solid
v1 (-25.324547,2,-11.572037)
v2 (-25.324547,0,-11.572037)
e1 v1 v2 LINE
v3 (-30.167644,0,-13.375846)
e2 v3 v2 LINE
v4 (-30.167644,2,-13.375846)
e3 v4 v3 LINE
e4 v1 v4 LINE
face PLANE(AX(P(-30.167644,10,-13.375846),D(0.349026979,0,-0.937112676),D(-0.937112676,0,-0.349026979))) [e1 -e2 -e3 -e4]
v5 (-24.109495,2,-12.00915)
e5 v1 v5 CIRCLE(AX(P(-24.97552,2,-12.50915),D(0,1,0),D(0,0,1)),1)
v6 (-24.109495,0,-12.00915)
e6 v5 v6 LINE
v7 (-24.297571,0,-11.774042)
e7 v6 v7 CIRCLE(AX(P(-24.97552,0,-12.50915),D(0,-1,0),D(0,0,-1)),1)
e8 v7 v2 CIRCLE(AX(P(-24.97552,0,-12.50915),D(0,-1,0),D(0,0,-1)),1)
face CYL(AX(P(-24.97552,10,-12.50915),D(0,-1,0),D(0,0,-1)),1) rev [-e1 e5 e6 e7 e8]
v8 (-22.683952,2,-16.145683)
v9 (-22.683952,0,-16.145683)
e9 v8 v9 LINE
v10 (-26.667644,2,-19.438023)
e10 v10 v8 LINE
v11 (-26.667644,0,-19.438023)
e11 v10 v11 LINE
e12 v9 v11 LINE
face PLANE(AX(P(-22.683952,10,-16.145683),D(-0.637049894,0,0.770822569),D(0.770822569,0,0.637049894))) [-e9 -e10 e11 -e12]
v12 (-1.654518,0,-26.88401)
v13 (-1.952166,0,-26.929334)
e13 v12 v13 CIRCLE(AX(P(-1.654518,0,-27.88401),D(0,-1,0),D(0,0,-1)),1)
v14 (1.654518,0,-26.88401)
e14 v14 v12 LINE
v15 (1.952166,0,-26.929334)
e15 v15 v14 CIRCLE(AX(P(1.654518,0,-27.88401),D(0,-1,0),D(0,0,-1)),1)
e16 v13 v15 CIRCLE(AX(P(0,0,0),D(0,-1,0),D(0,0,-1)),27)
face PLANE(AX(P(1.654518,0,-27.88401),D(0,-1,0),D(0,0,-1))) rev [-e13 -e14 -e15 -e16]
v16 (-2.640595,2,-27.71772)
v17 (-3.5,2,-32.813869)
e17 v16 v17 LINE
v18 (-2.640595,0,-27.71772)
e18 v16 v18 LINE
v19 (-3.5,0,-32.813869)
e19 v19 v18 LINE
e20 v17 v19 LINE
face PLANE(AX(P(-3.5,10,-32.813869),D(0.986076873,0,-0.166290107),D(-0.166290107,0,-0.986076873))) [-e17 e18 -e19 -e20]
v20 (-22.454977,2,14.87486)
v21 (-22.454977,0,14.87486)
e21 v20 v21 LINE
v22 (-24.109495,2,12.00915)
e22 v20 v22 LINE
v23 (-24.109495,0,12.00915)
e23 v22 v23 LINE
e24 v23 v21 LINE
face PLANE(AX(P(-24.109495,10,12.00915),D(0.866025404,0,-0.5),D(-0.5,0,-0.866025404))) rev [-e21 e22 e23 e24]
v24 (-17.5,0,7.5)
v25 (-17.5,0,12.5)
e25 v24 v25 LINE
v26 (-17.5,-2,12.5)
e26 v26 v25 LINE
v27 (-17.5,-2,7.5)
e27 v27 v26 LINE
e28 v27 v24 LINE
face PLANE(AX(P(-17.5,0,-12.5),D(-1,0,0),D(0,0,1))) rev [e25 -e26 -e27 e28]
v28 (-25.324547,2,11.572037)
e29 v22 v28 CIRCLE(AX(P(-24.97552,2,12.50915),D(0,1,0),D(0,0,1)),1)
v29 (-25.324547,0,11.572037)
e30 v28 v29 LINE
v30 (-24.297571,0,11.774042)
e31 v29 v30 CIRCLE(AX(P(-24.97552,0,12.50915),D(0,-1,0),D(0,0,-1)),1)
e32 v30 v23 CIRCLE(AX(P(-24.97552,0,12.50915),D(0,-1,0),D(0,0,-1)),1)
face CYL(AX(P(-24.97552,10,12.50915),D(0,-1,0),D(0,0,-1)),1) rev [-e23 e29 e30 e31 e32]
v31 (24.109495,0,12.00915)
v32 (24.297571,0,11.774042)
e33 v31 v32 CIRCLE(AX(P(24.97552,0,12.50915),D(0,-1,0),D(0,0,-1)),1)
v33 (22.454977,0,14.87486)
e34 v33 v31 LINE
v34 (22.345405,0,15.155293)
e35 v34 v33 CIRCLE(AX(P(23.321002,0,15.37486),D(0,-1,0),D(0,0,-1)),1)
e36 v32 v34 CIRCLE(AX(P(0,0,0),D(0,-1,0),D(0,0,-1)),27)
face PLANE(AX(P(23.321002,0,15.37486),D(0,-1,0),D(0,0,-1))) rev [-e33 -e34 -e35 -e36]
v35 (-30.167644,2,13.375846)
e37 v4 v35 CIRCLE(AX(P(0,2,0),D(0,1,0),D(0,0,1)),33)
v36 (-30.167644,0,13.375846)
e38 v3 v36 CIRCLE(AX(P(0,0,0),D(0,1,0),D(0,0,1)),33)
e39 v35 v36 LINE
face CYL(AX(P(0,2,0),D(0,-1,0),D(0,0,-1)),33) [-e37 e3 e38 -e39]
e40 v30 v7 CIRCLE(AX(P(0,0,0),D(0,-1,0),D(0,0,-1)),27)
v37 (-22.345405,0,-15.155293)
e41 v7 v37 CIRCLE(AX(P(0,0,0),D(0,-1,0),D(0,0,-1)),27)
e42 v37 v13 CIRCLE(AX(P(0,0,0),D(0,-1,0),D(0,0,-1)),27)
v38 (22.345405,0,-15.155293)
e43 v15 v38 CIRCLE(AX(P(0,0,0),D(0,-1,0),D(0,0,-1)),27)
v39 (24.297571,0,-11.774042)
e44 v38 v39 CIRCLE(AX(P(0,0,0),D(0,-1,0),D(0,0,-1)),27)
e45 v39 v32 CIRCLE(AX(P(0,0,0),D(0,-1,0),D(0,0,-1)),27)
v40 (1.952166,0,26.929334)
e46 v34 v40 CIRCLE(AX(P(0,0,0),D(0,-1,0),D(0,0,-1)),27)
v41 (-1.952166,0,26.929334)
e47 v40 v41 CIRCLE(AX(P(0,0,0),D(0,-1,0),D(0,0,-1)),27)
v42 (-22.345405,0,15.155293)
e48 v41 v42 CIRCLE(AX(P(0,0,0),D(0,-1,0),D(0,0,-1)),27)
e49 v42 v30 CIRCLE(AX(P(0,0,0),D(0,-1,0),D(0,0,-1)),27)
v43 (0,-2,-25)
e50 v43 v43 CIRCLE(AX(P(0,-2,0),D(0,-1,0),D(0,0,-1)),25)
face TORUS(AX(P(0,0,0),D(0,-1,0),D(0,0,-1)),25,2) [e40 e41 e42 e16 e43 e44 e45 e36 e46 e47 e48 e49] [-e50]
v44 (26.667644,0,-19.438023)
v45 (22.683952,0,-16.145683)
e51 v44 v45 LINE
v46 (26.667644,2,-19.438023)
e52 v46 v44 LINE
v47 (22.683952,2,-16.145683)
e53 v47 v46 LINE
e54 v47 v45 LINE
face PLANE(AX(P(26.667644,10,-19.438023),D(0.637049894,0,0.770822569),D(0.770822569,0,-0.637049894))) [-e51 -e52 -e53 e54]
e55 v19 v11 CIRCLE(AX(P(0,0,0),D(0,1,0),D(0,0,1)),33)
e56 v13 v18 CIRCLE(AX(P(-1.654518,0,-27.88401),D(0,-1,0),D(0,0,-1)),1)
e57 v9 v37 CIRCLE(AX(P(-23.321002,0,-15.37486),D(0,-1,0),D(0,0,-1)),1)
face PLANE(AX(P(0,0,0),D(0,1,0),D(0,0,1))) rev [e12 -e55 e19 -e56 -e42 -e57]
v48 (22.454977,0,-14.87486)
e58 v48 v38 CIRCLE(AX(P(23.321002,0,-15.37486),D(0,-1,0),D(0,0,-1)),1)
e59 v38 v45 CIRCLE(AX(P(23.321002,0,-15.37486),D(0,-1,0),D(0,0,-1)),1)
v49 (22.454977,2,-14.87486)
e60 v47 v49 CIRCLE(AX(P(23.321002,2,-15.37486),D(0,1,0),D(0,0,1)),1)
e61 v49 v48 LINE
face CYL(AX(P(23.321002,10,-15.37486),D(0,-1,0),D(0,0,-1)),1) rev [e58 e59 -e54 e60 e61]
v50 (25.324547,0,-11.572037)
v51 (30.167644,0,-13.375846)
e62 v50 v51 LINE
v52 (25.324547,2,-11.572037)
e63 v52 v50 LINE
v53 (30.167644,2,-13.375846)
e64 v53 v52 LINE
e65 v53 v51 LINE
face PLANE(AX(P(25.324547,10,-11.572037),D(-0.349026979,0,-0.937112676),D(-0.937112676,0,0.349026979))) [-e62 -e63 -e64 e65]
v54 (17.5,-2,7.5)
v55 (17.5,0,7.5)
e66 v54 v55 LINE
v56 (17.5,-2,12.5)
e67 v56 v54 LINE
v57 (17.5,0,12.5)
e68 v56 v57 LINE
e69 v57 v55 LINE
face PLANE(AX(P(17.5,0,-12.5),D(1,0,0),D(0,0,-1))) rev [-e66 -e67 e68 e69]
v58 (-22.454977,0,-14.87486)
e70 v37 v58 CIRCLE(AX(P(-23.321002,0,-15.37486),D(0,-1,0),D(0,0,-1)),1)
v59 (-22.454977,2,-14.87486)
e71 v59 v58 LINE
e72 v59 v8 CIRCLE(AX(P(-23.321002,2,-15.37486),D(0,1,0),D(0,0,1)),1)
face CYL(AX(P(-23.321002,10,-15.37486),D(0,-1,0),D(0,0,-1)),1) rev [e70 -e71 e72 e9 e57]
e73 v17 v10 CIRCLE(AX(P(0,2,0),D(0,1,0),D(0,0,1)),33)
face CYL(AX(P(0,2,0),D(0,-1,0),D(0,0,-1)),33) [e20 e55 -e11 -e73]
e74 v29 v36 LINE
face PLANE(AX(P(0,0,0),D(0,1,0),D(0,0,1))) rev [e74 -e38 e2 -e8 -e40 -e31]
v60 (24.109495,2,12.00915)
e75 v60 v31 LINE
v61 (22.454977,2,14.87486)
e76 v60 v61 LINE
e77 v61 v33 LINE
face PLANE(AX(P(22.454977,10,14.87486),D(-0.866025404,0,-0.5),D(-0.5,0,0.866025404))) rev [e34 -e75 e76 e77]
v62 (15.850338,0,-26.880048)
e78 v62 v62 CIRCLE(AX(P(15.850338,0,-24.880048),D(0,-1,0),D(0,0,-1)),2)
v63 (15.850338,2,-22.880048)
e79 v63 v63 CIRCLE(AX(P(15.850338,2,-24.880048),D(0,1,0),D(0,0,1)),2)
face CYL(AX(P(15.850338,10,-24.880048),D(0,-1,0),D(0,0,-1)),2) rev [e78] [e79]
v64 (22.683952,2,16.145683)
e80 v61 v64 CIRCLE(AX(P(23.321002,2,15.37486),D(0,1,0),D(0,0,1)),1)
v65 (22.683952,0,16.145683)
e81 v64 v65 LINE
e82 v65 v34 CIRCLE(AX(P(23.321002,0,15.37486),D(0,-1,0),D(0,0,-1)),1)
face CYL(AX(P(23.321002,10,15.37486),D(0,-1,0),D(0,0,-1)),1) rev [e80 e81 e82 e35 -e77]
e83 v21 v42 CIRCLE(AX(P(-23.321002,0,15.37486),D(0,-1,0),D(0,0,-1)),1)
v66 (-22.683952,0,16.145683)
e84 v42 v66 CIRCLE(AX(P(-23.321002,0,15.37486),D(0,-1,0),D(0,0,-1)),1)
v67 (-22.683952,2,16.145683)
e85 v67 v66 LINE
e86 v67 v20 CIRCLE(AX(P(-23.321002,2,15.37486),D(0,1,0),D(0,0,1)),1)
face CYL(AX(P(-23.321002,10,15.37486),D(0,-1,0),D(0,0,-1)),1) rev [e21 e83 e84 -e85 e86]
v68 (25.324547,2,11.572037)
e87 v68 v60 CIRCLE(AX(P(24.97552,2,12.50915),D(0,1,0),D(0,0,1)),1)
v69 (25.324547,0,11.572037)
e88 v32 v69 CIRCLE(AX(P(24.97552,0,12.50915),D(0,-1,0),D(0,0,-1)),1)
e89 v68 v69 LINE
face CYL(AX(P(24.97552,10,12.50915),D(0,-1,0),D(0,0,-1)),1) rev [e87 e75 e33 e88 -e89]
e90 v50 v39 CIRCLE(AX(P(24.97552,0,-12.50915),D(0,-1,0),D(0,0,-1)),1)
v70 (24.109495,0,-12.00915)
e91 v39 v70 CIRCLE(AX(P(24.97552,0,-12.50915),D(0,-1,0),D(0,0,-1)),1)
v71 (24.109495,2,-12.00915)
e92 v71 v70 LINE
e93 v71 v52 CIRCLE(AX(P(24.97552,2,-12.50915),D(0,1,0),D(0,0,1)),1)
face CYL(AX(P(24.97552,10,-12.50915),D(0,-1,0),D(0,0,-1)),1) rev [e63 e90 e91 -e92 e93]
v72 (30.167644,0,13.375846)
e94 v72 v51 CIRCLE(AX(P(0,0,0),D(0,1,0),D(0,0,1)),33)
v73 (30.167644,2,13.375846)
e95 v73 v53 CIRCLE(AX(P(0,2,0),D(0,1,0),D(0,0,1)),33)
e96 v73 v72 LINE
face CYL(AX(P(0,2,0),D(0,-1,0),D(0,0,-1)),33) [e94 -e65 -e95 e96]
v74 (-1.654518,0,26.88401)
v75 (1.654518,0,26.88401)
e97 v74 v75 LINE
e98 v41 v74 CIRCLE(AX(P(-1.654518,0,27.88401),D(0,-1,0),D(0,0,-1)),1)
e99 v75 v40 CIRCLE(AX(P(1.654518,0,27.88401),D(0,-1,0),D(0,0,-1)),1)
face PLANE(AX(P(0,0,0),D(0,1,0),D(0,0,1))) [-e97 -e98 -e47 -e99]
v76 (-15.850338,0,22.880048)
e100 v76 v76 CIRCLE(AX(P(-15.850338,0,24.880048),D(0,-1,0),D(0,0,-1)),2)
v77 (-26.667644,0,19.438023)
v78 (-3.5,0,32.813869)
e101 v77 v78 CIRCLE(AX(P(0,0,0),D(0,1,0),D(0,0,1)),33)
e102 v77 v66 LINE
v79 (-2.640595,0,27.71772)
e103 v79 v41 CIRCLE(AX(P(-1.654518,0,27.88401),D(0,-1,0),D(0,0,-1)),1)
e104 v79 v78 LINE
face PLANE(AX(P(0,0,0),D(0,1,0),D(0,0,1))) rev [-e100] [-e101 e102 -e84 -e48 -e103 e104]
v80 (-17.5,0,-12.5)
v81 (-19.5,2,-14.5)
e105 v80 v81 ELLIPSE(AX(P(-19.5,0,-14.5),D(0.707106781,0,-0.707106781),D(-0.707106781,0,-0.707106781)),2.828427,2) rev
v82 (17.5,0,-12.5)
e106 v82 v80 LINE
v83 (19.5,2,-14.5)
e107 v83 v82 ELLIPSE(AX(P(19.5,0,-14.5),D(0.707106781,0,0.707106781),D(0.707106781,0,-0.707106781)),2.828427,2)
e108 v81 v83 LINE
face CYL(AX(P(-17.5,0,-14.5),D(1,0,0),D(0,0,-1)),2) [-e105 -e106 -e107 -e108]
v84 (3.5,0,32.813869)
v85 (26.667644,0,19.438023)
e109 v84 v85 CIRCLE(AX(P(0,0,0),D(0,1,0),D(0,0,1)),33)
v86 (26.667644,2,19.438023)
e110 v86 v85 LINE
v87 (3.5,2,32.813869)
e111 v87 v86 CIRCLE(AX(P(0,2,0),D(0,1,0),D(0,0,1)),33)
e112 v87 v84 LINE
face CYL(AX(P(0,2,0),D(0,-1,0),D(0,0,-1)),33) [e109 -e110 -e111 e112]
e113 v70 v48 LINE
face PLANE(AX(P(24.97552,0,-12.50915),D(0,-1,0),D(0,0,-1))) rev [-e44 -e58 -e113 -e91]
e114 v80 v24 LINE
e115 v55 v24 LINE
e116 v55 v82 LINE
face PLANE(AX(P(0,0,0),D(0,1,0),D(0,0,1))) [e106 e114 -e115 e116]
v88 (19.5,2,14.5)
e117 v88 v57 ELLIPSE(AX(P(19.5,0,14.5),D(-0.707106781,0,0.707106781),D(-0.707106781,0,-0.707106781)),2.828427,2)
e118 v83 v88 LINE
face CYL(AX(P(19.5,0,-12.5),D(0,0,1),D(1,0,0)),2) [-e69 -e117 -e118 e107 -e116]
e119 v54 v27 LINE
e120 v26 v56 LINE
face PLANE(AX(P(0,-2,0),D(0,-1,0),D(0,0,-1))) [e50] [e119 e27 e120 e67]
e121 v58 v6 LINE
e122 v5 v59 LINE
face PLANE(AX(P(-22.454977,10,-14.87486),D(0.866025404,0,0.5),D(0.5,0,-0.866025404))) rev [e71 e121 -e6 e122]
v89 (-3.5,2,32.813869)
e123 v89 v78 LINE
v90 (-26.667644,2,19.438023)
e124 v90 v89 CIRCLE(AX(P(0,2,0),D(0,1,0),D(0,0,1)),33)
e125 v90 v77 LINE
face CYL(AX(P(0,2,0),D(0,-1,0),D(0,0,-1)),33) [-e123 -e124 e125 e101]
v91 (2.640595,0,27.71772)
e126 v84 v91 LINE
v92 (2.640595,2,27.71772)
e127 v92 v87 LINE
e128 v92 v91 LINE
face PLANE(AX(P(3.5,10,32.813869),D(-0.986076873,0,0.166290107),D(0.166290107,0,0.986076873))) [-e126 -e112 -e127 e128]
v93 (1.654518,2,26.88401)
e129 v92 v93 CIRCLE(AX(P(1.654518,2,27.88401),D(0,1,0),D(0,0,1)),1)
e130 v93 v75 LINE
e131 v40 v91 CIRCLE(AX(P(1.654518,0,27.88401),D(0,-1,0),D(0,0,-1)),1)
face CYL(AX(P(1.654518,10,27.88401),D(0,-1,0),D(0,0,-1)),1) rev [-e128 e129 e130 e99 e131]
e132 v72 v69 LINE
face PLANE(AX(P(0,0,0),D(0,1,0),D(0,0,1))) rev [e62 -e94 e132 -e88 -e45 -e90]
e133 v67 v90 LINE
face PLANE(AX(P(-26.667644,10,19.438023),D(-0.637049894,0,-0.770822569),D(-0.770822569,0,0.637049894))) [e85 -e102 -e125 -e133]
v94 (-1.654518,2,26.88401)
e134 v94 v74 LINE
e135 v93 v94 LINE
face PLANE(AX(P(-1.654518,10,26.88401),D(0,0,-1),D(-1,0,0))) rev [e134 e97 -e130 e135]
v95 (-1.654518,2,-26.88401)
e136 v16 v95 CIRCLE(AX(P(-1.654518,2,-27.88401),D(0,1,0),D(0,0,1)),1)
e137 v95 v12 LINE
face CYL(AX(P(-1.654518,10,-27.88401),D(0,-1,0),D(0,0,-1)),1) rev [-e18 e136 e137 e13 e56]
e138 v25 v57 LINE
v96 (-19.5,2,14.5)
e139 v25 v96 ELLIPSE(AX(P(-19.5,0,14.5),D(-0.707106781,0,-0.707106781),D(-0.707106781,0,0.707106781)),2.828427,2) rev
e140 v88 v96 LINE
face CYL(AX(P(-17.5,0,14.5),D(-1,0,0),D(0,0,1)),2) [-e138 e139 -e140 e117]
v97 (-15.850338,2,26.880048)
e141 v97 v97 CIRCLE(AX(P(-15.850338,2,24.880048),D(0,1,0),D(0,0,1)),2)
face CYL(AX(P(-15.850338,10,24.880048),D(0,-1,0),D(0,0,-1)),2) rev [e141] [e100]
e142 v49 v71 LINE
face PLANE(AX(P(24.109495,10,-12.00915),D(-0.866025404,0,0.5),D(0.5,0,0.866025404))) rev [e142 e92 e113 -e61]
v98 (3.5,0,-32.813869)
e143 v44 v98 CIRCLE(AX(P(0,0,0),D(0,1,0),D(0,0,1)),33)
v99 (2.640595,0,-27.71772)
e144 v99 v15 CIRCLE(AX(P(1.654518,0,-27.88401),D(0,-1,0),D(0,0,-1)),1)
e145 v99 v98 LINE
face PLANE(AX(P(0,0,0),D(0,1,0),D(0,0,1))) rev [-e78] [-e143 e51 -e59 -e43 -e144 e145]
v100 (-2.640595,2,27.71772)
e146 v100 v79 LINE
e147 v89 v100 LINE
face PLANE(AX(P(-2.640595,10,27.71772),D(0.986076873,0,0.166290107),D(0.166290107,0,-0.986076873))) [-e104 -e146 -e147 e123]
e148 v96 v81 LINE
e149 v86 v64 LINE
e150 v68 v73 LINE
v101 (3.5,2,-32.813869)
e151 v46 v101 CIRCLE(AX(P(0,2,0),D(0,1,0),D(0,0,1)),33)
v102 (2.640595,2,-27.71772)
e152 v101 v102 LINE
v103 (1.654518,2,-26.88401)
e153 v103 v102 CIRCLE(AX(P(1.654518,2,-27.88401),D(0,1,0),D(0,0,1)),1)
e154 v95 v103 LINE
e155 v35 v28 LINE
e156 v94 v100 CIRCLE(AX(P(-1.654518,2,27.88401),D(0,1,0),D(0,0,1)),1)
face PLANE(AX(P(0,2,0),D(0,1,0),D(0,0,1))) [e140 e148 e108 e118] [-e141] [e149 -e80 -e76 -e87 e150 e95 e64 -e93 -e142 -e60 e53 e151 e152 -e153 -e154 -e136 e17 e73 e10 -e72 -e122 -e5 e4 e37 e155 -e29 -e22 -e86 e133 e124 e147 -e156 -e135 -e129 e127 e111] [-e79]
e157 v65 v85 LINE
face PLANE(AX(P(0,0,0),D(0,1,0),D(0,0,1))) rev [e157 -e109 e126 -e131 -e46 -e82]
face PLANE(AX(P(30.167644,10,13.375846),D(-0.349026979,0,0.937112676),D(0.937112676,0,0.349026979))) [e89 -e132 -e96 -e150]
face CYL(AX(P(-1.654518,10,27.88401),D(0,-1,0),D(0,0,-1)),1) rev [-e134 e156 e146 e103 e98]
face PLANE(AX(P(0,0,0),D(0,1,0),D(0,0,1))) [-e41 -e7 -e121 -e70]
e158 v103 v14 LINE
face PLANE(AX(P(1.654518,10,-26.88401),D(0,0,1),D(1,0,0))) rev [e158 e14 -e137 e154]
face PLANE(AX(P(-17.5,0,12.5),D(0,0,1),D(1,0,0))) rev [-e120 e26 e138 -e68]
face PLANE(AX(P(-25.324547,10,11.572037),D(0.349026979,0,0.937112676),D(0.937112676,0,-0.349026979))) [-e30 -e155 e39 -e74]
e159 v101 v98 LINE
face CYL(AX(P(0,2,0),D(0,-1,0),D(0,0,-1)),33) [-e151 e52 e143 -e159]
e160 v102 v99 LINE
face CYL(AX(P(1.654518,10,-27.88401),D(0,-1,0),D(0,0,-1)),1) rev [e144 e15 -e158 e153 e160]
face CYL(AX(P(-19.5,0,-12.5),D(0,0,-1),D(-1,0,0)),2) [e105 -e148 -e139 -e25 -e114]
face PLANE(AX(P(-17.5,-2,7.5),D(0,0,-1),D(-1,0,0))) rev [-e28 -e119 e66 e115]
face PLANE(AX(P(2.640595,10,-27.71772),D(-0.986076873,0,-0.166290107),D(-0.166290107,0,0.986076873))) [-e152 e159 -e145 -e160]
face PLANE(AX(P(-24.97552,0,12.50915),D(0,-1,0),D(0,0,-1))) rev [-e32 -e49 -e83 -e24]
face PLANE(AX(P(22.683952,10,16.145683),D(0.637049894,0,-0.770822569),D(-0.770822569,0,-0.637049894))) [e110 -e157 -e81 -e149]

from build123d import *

# Parameters (mm, degrees)
SKETCH1_R               = 33
BOSS_EXTRUDE1_DEPTH     = 2
SKETCH5_R               = 27
BOSS_EXTRUDE2_DEPTH     = 2
SKETCH7_W               = 35
SKETCH7_H               = 25
CUT_EXTRUDE2_DEPTH      = 2
FILLET5_R               = 2
CUT_EXTRUDE3_DEPTH      = 47.840153715
CUT_EXTRUDE3_DEPTH_BACK = 47.840153715
SKETCH8_W               = 35
SKETCH8_H               = 5
FILLET3_R               = 2
SKETCH6_R               = 2
CUT_EXTRUDE4_DEPTH      = 10


with BuildPart() as part:
    # Sketch1 → Boss-Extrude1 (new body)
    with BuildSketch(Plane(origin=(0, 0, 0), x_dir=(1, 0, 0), z_dir=(0, 1, 0))):
        with Locations(Location((0, 0, 0), (0, 0, 270))):
            Circle(SKETCH1_R)
    extrude(amount=BOSS_EXTRUDE1_DEPTH)

    # Sketch5 → Boss-Extrude2 (add)
    with BuildSketch(Plane.XZ):
        with Locations(Location((0, 0, 0), (0, 0, 270))):
            Circle(SKETCH5_R)
    extrude(amount=BOSS_EXTRUDE2_DEPTH)

    # Sketch7 → Cut-Extrude2 (cut)
    with BuildSketch(Plane(origin=(0, 2, 0), x_dir=(1, 0, 0), z_dir=(0, 1, 0))):
        Rectangle(SKETCH7_W, SKETCH7_H)
    extrude(amount=-CUT_EXTRUDE2_DEPTH, mode=Mode.SUBTRACT)

    # Fillet5
    fillet5_edges = [part.edges().sort_by_distance(p)[0] for p in [
        (0, -2, 27),
    ]]
    fillet(fillet5_edges, radius=FILLET5_R - 0.0001)  # a hair under: the kernel refuses the full size

    # Sketch8 → Cut-Extrude3 (cut, two sides: drawn at the far end of the back side and taken through both)
    with BuildSketch(Plane(origin=(0, 2, 0), x_dir=(1, 0, 0), z_dir=(0, 1, 0)).offset(-CUT_EXTRUDE3_DEPTH_BACK)):
        with Locations((0, -10)):
            Rectangle(SKETCH8_W, SKETCH8_H)
    extrude(amount=CUT_EXTRUDE3_DEPTH + CUT_EXTRUDE3_DEPTH_BACK, mode=Mode.SUBTRACT)

    # Fillet3
    fillet3_edges = [part.edges().sort_by_distance(p)[0] for p in [
        (0, 2, 12.5),
        (-17.5, 2, 0),
        (0, 2, -12.5),
        (17.5, 2, 0),
    ]]
    fillet(fillet3_edges, radius=FILLET3_R - 0.0001)  # a hair under: the kernel refuses the full size

    # Sketch6 → Cut-Extrude4 (cut)
    with BuildSketch(Plane.XZ):
        with BuildLine():
            ThreePointArc((3.5, 32.813869019), (0, 33), (-3.5, 32.813869019))
            Line((-3.5, 32.813869019), (-2.640595233, 27.71772001))
            ThreePointArc((-2.640595233, 27.71772001), (-2.300161408, 27.12037077), (-1.654518359, 26.884010118))
            Line((-1.654518359, 26.884010118), (1.654518359, 26.884010118))
            ThreePointArc((1.654518359, 26.884010118), (2.300161408, 27.12037077), (2.640595233, 27.71772001))
            Line((2.640595233, 27.71772001), (3.5, 32.813869019))
        make_face()
        with BuildLine():
            Line((25.32454728, 11.572037452), (30.167644167, 13.375845596))
            ThreePointArc((30.167644167, 13.375845596), (28.578838325, 16.5), (26.667644167, 19.438023423))
            Line((26.667644167, 19.438023423), (22.683952047, 16.145682558))
            ThreePointArc((22.683952047, 16.145682558), (22.336849342, 15.552183597), (22.454976538, 14.874859989))
            Line((22.454976538, 14.874859989), (24.109494897, 12.009150128))
            ThreePointArc((24.109494897, 12.009150128), (24.637010751, 11.568187173), (25.32454728, 11.572037452))
        make_face()
        with Locations(Location((-15.850338446, 24.880047651, 0), (0, 0, 270))):
            Circle(SKETCH6_R)
        with BuildLine():
            Line((-30.167644167, 13.375845596), (-25.32454728, 11.572037452))
            ThreePointArc((-25.32454728, 11.572037452), (-24.637010751, 11.568187173), (-24.109494897, 12.009150128))
            Line((-24.109494897, 12.009150128), (-22.454976538, 14.874859989))
            ThreePointArc((-22.454976538, 14.874859989), (-22.336849342, 15.552183597), (-22.683952047, 16.145682558))
            Line((-22.683952047, 16.145682558), (-26.667644167, 19.438023423))
            ThreePointArc((-26.667644167, 19.438023423), (-28.578838325, 16.5), (-30.167644167, 13.375845596))
        make_face()
        with BuildLine():
            Line((22.683952047, -16.145682558), (26.667644167, -19.438023423))
            ThreePointArc((26.667644167, -19.438023423), (28.578838325, -16.5), (30.167644167, -13.375845596))
            Line((30.167644167, -13.375845596), (25.32454728, -11.572037452))
            ThreePointArc((25.32454728, -11.572037452), (24.637010751, -11.568187173), (24.109494897, -12.009150128))
            Line((24.109494897, -12.009150128), (22.454976538, -14.874859989))
            ThreePointArc((22.454976538, -14.874859989), (22.336849342, -15.552183597), (22.683952047, -16.145682558))
        make_face()
        with Locations(Location((15.850338446, -24.880047651, 0), (0, 0, 270))):
            Circle(SKETCH6_R)
        with BuildLine():
            Line((-26.667644167, -19.438023423), (-22.683952047, -16.145682558))
            ThreePointArc((-22.683952047, -16.145682558), (-22.336849342, -15.552183597), (-22.454976538, -14.874859989))
            Line((-22.454976538, -14.874859989), (-24.109494897, -12.009150128))
            ThreePointArc((-24.109494897, -12.009150128), (-24.637010751, -11.568187173), (-25.32454728, -11.572037452))
            Line((-25.32454728, -11.572037452), (-30.167644167, -13.375845596))
            ThreePointArc((-30.167644167, -13.375845596), (-28.578838325, -16.5), (-26.667644167, -19.438023423))
        make_face()
        with BuildLine():
            Line((-2.640595233, -27.71772001), (-3.5, -32.813869019))
            ThreePointArc((-3.5, -32.813869019), (0, -33), (3.5, -32.813869019))
            Line((3.5, -32.813869019), (2.640595233, -27.71772001))
            ThreePointArc((2.640595233, -27.71772001), (2.300161408, -27.12037077), (1.654518359, -26.884010118))
            Line((1.654518359, -26.884010118), (-1.654518359, -26.884010118))
            ThreePointArc((-1.654518359, -26.884010118), (-2.300161408, -27.12037077), (-2.640595233, -27.71772001))
        make_face()
    extrude(amount=-CUT_EXTRUDE4_DEPTH, mode=Mode.SUBTRACT)


solid = part.part
